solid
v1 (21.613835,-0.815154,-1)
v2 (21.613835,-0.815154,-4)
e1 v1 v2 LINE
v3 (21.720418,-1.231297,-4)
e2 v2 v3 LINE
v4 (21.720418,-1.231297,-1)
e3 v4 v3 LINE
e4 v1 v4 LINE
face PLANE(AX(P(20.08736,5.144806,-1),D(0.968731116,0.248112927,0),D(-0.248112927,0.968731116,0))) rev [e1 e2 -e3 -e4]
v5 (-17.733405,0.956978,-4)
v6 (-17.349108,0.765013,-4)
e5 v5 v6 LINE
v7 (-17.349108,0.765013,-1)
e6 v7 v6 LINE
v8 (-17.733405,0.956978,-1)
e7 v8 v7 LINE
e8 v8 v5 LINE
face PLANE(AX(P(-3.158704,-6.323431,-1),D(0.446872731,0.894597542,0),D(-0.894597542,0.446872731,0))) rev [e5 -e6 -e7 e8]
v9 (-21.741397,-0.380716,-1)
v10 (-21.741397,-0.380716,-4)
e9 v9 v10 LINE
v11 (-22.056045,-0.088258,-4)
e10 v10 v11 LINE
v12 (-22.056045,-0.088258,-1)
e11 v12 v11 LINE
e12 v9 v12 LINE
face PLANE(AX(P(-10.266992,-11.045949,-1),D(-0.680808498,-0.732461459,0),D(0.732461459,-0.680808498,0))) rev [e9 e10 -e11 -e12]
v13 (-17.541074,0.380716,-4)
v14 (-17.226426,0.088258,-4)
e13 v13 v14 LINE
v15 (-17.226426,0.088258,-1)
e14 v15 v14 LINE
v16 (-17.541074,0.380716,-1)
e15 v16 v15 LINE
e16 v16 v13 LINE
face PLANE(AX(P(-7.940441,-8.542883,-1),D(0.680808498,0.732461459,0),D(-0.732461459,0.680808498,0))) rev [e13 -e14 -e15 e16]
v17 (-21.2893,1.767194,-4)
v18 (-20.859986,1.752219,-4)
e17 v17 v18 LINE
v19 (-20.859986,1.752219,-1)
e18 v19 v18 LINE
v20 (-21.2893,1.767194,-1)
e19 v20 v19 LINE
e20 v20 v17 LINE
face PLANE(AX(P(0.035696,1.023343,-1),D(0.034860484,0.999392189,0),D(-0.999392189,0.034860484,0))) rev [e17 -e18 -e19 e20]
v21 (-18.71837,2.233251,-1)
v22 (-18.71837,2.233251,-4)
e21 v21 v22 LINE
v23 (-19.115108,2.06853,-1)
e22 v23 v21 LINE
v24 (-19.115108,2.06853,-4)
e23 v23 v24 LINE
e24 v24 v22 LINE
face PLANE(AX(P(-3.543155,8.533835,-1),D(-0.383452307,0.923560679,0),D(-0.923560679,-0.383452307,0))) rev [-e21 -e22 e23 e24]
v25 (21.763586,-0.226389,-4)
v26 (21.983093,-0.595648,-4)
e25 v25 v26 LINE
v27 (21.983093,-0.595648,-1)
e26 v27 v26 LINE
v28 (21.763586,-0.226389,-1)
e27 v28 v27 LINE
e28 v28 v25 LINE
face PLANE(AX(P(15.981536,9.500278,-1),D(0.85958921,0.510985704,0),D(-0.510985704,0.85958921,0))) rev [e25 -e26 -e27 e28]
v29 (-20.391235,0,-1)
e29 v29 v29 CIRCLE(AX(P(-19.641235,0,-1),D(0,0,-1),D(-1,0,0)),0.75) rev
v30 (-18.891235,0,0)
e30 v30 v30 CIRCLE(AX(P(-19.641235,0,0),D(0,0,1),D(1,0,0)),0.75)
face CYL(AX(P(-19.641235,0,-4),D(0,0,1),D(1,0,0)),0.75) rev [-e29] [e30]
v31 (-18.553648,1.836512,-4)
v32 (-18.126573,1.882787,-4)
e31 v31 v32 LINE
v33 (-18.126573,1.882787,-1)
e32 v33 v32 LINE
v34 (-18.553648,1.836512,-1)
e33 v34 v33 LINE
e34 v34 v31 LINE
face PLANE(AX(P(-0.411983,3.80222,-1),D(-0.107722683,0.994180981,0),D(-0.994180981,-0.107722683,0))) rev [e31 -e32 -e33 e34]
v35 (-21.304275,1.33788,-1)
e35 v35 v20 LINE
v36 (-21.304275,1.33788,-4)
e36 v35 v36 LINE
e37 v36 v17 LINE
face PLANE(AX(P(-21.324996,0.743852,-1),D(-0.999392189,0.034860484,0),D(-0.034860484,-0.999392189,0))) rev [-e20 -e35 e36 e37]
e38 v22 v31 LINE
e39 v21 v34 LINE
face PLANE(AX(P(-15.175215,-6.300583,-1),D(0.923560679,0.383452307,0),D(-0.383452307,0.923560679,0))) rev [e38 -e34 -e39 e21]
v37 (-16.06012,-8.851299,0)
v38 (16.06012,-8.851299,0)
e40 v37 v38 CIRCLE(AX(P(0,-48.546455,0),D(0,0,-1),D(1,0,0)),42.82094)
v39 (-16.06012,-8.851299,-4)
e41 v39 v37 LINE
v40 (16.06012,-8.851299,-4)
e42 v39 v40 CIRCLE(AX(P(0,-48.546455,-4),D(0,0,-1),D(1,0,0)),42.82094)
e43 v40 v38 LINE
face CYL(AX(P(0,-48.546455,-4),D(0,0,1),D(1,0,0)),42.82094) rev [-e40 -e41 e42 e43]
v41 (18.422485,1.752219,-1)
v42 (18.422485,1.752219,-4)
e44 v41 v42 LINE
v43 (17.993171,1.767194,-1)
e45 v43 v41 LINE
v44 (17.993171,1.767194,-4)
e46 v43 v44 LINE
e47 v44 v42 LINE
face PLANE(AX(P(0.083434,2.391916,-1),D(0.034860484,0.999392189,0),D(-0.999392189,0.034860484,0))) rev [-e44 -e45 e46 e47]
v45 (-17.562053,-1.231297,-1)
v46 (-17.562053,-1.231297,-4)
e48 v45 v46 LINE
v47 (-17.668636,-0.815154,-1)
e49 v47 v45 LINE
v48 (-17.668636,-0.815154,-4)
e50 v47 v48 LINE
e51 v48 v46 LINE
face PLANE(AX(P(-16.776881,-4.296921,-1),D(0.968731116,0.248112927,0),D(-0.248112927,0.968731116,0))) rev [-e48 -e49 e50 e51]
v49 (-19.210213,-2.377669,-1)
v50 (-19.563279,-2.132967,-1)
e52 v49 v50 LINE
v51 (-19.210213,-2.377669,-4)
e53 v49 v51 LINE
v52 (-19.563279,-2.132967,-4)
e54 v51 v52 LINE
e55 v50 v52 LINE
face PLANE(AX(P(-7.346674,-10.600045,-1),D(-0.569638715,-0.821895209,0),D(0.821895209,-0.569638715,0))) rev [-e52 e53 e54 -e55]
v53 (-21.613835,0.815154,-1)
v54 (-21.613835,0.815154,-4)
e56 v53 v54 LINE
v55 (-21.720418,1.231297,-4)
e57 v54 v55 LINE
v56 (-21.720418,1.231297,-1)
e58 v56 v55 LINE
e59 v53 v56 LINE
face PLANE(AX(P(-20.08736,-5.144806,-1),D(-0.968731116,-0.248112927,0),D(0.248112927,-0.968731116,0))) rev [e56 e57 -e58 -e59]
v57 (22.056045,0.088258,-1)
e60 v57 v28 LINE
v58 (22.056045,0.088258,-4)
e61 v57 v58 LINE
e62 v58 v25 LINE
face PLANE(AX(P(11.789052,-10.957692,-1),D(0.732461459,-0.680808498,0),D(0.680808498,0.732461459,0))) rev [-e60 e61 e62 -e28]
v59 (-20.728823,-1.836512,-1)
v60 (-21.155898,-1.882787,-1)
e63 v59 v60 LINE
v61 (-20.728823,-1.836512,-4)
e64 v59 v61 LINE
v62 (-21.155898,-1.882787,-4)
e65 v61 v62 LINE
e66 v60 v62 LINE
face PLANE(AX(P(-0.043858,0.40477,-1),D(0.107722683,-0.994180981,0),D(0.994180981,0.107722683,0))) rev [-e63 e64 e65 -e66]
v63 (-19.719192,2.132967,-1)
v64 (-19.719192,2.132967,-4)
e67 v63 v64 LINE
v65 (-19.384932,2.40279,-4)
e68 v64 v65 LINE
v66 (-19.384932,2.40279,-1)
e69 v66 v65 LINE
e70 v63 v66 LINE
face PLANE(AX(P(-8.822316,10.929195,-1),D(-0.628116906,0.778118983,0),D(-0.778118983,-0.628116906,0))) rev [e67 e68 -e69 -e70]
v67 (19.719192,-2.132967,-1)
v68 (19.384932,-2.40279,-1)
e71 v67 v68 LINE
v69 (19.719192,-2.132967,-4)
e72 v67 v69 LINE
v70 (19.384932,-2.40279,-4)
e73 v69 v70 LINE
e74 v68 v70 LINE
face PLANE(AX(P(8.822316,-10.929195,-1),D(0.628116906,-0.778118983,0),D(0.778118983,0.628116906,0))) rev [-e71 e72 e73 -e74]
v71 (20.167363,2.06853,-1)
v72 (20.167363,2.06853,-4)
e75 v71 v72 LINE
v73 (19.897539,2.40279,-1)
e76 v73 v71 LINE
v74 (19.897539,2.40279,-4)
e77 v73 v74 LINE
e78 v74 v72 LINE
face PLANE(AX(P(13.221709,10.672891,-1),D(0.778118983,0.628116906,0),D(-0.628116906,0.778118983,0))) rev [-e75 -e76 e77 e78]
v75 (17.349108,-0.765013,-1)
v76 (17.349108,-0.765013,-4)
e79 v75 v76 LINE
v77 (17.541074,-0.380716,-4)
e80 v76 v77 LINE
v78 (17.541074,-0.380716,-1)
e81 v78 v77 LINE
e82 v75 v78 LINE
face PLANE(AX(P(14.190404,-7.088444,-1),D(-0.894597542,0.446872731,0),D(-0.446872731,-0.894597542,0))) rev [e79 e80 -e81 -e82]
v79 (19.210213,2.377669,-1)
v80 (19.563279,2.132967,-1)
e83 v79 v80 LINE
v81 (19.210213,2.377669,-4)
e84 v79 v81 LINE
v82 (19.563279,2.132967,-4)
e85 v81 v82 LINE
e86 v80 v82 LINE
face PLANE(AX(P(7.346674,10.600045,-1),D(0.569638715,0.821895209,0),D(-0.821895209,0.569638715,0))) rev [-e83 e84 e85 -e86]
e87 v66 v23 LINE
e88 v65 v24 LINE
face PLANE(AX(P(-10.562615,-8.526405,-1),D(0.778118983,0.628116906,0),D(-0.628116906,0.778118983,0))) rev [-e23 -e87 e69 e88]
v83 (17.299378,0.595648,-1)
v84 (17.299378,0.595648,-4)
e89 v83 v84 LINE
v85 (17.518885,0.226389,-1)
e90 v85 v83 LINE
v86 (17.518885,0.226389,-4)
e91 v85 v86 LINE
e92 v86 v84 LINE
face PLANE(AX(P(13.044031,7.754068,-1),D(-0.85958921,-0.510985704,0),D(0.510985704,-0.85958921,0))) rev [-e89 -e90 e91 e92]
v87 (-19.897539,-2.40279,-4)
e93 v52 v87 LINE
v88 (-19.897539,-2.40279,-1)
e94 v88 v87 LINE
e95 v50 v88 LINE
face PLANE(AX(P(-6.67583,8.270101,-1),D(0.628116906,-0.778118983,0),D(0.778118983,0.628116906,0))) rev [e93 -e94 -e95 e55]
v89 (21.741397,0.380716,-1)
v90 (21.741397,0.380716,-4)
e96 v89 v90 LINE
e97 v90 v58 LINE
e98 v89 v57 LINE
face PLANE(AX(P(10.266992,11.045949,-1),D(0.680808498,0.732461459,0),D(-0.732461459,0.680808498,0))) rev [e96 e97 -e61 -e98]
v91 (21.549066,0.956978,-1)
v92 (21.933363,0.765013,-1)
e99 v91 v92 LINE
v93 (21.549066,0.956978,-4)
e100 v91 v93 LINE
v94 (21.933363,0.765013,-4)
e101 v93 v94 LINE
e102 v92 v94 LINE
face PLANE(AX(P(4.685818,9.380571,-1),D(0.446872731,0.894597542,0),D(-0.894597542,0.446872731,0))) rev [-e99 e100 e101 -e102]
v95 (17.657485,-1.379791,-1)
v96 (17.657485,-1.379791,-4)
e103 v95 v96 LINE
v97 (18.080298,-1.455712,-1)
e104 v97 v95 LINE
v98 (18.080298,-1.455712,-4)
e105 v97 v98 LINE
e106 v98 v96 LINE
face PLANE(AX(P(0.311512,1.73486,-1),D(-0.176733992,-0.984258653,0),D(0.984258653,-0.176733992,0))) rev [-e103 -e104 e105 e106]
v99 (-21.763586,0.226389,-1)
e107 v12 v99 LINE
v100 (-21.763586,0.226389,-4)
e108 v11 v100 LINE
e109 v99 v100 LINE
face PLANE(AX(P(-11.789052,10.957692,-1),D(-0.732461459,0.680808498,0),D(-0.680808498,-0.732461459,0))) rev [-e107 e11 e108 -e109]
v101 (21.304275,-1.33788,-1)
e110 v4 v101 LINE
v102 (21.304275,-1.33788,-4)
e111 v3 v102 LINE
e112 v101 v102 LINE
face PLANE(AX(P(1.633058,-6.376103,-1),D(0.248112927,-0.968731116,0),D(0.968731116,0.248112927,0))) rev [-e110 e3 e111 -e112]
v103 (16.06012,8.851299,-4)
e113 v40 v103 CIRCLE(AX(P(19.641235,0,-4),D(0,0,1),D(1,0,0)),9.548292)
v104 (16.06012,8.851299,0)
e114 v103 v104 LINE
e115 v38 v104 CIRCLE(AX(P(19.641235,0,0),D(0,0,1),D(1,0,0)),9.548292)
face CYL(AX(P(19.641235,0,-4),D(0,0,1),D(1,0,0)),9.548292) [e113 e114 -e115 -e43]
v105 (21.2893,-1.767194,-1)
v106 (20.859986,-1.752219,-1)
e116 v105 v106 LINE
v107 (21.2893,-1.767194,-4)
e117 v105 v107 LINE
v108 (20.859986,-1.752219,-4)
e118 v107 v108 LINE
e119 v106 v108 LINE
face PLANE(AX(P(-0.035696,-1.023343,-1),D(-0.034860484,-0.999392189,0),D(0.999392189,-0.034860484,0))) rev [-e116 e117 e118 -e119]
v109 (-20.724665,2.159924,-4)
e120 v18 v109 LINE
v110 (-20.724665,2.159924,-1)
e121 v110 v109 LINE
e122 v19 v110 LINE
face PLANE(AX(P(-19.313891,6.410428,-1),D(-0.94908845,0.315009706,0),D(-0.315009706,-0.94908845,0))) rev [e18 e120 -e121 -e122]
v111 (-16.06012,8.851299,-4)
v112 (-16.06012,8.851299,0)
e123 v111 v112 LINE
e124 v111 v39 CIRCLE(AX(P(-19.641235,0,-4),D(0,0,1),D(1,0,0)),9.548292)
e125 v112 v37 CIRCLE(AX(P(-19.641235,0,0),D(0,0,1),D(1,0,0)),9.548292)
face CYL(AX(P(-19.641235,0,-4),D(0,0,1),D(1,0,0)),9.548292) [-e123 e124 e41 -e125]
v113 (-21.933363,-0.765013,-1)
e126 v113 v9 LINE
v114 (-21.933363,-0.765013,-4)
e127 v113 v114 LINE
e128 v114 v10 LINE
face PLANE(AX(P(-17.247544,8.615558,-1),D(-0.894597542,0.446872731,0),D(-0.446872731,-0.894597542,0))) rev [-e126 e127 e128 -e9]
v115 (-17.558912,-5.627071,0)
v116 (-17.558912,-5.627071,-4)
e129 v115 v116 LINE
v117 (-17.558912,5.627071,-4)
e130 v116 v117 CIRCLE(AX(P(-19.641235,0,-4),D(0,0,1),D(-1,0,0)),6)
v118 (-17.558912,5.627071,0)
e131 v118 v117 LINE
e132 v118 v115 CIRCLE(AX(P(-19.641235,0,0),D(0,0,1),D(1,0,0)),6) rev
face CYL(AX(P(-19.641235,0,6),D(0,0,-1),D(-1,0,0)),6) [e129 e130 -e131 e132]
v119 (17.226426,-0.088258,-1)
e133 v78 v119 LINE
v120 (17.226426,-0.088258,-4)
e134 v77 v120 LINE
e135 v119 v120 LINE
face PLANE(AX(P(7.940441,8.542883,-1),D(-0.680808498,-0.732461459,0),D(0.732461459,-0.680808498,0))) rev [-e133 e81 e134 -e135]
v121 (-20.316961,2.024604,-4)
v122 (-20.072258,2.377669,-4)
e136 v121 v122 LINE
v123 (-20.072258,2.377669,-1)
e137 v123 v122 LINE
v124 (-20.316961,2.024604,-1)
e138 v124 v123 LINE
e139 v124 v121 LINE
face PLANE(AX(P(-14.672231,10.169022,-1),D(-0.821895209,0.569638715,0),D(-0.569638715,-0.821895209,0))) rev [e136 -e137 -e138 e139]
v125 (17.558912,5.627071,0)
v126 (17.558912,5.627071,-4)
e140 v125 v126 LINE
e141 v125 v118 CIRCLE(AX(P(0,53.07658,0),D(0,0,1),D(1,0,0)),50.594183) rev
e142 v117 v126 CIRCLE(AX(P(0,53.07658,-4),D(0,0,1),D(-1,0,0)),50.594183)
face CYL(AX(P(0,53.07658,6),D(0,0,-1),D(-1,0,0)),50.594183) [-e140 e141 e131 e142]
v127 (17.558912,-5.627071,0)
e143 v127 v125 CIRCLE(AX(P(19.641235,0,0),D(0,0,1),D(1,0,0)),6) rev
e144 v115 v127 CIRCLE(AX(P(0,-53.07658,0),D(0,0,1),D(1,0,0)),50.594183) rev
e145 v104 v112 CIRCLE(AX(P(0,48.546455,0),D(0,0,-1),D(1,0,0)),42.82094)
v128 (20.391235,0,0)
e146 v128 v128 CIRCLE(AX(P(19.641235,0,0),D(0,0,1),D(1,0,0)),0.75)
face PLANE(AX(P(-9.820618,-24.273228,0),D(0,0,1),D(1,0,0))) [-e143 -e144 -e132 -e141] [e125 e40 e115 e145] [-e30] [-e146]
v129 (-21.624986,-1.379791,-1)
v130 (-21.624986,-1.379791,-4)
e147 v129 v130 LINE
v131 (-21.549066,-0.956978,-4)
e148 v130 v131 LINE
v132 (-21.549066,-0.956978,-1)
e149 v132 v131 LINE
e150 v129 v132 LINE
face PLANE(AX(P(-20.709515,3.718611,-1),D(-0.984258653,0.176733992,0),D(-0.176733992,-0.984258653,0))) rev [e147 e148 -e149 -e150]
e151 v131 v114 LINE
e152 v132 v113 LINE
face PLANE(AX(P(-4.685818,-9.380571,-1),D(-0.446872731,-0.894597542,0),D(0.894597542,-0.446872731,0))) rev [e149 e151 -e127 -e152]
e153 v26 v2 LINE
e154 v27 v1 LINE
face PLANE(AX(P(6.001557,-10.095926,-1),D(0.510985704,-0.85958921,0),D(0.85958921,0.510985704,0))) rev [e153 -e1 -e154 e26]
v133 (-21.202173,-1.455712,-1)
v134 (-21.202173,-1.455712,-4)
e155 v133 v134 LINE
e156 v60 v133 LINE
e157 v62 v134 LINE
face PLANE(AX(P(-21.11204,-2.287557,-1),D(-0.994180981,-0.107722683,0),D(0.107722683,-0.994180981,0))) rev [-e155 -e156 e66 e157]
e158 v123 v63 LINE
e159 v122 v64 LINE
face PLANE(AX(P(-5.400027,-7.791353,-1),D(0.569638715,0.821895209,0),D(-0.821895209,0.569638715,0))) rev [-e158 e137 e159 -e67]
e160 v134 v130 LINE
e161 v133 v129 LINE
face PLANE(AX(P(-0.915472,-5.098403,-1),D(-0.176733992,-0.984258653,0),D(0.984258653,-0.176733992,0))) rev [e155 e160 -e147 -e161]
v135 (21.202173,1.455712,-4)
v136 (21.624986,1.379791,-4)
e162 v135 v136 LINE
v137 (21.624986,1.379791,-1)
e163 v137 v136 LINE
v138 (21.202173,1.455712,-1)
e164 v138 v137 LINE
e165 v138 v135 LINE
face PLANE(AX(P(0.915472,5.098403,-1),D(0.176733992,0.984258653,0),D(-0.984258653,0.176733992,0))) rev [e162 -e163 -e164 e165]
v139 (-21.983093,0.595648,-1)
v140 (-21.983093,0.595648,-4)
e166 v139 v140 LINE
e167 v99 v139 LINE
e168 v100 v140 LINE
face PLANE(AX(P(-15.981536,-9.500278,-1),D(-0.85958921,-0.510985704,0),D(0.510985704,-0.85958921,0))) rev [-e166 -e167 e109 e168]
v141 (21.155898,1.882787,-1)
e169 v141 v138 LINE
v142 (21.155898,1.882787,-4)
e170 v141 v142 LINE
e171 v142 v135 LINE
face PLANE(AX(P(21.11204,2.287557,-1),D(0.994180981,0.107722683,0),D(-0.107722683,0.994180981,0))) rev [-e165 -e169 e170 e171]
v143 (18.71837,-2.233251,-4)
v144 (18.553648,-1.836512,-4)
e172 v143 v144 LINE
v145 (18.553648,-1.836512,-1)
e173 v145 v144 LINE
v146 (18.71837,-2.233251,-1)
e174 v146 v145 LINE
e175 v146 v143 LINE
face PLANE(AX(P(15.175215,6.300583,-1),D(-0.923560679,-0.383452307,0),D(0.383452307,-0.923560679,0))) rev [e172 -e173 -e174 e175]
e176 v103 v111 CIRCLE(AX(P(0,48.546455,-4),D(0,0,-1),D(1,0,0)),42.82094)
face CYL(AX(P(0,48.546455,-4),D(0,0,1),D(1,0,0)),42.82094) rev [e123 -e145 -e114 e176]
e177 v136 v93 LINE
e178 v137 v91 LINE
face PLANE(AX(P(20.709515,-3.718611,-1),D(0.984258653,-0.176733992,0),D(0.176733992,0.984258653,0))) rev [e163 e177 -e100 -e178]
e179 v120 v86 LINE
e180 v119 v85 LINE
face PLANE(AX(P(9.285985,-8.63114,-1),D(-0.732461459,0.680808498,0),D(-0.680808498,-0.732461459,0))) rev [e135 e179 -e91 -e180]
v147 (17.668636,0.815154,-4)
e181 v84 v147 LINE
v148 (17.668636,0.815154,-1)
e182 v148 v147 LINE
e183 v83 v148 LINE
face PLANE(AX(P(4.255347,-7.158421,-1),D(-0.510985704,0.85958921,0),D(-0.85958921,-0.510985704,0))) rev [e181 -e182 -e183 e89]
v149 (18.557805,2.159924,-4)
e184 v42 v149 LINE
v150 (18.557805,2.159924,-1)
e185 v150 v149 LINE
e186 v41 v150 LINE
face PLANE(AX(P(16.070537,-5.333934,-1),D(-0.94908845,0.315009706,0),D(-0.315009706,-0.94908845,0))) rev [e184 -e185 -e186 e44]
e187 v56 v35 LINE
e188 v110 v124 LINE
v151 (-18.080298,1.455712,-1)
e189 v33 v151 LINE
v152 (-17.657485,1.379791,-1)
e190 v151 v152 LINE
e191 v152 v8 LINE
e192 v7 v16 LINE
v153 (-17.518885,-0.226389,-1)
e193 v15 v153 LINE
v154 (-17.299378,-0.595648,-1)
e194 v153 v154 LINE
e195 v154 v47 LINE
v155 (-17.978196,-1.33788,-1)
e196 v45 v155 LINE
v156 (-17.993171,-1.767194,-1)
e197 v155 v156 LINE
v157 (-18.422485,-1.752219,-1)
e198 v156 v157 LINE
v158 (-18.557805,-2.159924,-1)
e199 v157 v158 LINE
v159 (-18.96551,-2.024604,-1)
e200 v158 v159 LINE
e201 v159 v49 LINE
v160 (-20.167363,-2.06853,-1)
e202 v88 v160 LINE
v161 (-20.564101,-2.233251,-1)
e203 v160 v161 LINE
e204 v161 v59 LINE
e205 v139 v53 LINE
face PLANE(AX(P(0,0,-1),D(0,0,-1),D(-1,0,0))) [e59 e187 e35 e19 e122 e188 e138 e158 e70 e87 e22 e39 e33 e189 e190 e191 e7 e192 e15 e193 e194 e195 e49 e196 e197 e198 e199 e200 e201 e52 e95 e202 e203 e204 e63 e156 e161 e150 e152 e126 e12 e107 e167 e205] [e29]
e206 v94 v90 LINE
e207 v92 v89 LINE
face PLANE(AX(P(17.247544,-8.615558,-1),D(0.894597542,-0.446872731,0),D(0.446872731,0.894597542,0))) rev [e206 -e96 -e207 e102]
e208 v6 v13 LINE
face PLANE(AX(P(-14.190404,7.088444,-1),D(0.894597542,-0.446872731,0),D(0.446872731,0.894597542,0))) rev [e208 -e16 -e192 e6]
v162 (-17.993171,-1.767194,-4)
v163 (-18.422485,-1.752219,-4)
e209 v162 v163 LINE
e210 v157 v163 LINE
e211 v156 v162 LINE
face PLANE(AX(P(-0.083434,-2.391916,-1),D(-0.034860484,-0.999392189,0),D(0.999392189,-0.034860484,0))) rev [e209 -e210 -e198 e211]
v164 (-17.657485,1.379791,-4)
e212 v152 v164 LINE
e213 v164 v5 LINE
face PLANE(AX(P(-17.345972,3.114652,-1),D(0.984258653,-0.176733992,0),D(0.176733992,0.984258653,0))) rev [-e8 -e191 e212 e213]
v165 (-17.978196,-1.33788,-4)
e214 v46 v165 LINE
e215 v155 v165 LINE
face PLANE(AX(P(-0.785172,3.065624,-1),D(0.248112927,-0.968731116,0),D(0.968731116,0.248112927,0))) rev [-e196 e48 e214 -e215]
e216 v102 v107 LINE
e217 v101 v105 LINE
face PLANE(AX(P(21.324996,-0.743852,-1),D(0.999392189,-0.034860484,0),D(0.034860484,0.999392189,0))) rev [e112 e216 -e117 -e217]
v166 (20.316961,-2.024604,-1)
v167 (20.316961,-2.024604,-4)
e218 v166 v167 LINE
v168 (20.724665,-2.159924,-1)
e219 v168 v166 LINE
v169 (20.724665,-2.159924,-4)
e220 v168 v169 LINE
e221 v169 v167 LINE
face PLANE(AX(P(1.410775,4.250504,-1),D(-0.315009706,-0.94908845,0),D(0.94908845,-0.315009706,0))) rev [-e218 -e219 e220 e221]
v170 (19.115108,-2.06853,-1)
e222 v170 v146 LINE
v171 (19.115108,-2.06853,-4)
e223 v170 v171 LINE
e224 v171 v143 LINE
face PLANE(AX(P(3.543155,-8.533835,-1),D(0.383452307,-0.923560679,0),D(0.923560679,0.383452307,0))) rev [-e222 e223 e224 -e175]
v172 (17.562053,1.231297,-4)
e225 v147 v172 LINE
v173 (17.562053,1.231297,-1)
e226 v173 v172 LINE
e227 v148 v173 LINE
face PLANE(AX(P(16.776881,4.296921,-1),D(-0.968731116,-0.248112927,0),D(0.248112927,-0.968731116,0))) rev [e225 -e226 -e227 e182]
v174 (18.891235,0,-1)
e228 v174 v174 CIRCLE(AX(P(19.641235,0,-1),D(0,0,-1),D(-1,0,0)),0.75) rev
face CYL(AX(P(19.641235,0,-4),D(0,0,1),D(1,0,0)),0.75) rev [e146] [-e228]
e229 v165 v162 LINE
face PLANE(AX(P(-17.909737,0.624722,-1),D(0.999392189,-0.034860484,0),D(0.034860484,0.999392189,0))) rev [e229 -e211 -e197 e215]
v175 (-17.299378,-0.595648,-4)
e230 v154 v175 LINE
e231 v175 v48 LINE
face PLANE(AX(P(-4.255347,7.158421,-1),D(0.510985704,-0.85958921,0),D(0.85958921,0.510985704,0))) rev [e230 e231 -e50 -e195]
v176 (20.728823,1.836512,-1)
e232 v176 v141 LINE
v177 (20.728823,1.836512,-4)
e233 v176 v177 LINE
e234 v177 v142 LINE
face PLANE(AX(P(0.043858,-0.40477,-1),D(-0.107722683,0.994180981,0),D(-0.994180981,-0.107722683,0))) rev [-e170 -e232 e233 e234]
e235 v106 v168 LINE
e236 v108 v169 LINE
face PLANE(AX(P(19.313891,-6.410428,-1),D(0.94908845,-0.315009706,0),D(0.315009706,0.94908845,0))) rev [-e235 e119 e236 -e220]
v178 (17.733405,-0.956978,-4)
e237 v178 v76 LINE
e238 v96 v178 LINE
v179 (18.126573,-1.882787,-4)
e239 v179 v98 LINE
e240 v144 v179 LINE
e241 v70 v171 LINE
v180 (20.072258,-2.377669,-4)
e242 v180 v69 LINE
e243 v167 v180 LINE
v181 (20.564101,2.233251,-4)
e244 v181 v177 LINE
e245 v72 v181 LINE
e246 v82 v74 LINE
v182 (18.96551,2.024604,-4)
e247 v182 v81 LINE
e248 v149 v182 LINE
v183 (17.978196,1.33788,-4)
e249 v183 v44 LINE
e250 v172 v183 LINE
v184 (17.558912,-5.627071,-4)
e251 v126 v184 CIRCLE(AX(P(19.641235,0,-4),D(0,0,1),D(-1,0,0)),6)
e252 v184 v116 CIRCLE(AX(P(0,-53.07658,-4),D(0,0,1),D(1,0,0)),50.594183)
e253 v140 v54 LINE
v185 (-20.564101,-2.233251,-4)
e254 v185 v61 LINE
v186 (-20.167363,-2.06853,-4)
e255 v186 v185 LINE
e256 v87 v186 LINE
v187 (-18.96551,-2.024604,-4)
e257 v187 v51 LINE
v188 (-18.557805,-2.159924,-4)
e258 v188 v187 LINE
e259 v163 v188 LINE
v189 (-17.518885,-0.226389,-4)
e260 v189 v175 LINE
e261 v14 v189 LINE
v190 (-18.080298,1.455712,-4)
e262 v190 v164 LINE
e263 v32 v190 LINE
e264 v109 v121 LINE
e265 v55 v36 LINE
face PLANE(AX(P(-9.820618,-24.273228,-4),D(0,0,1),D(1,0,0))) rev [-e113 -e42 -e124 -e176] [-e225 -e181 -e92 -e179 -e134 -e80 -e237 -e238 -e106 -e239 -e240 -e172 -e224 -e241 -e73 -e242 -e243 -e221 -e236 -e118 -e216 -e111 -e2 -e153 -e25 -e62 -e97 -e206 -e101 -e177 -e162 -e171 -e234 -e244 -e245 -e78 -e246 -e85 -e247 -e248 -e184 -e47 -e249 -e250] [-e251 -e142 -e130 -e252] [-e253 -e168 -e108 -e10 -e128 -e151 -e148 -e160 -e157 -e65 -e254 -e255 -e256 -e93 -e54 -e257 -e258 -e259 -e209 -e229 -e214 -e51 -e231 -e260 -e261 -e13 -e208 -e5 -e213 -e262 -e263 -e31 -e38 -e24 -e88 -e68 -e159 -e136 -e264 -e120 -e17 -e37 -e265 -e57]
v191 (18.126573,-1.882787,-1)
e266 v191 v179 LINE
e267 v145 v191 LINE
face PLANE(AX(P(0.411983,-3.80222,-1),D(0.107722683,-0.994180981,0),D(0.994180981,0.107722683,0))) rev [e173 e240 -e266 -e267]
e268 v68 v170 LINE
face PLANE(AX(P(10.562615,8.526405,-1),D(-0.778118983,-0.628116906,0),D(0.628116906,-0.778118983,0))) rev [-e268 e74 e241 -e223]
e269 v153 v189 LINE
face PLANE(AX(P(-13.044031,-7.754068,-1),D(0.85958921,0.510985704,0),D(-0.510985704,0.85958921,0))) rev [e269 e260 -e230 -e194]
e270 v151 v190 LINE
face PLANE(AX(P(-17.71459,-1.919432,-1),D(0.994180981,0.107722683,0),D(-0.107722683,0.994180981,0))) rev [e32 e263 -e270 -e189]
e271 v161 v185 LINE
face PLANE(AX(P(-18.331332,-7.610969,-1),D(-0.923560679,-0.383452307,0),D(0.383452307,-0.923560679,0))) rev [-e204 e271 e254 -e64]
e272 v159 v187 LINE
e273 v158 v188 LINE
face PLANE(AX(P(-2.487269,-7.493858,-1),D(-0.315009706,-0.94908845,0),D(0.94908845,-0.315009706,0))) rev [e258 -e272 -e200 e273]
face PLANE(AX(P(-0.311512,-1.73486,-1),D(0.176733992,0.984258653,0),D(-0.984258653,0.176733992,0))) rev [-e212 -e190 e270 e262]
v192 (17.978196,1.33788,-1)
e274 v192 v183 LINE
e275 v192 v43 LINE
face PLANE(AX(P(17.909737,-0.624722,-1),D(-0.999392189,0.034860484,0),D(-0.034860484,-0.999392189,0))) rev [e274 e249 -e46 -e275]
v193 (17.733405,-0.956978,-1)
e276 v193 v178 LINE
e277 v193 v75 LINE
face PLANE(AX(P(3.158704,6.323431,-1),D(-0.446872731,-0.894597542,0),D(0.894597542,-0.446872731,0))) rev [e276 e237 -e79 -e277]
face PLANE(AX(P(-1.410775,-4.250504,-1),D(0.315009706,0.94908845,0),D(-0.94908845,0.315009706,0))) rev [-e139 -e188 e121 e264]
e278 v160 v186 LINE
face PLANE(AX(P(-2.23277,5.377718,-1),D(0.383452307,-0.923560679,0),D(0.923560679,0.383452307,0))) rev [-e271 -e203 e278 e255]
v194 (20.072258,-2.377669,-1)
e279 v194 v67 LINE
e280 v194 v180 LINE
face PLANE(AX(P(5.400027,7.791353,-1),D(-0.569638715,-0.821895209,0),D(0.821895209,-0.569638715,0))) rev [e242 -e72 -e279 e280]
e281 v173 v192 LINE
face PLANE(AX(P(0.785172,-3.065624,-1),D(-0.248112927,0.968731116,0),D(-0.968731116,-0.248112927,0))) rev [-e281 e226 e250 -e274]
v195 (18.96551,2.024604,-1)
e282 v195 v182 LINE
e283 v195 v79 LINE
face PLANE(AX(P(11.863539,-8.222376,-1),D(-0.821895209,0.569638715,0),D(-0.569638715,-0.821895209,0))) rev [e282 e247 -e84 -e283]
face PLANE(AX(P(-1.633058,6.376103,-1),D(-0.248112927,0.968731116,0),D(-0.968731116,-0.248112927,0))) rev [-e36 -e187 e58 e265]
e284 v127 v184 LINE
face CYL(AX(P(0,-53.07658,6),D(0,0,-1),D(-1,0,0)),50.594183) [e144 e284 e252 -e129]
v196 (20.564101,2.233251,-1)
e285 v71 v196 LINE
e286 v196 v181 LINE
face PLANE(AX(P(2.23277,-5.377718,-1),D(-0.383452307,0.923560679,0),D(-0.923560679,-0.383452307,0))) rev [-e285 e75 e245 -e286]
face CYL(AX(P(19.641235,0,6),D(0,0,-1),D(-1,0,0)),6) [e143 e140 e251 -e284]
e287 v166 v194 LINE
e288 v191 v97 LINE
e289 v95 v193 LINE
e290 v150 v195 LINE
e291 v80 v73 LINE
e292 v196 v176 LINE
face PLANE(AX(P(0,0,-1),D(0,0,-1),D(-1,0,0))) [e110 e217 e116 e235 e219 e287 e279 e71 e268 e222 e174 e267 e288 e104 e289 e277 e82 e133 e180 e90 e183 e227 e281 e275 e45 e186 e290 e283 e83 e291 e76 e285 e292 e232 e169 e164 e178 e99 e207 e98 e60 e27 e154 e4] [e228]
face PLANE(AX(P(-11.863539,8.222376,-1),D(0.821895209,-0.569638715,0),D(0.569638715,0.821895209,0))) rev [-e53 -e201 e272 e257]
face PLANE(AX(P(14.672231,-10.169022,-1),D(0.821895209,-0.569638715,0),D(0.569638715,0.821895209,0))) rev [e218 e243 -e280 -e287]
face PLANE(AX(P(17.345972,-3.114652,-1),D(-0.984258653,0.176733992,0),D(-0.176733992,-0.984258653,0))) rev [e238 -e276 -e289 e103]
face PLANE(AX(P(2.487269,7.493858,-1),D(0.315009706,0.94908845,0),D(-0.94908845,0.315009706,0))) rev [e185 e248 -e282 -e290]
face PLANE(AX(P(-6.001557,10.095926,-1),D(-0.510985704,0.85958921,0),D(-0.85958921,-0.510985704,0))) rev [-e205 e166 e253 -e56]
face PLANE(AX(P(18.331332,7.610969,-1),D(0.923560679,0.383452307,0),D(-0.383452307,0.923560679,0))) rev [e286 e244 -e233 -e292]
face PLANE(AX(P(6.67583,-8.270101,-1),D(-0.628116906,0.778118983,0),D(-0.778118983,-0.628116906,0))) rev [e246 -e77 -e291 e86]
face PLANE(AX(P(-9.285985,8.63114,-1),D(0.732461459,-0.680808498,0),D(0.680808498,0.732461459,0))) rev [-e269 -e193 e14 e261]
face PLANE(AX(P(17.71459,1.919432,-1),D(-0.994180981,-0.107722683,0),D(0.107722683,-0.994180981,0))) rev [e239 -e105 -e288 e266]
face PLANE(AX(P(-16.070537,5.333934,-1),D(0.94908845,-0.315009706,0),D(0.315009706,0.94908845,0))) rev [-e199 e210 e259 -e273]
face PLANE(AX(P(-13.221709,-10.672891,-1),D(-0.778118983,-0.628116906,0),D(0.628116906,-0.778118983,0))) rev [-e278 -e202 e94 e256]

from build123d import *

# Parameters (mm, degrees)
SKIZZE1_R                           = 0.75
AUFSATZ_LINEAR_AUSTRAGEN1_DEPTH     = 4
SCHNITT_LINEAR_START                = -3
SCHNITT_LINEAR_AUSTRAGEN2_OUTLINE_R = 0.75
SCHNITT_LINEAR_AUSTRAGEN2_DEPTH     = 3
SCHNITT_LINEAR_AUSTRAGEN3_DEPTH     = 10


# Read off the part's stored shape, not the designer's step: Schnitt-Linear austragen2
with BuildPart() as part:
    # Skizze1 → Aufsatz-Linear austragen1 (new body)
    with BuildSketch(Plane.XY):
        with BuildLine():
            ThreePointArc((-16.060120321, 8.85129891), (0, 5.725515256), (16.060120321, 8.85129891))
            ThreePointArc((16.060120321, 8.85129891), (29.189527365, 0), (16.060120321, -8.85129891))
            ThreePointArc((16.060120321, -8.85129891), (0, -5.725515256), (-16.060120321, -8.85129891))
            ThreePointArc((-16.060120321, -8.85129891), (-29.189527365, 0), (-16.060120321, 8.85129891))
        make_face()
        with Locations((-19.641235471, 0)):
            Circle(SKIZZE1_R, mode=Mode.SUBTRACT)
        with Locations((19.641235471, 0)):
            Circle(SKIZZE1_R, mode=Mode.SUBTRACT)
    extrude(amount=-AUFSATZ_LINEAR_AUSTRAGEN1_DEPTH)

    # Schnitt-Linear austragen2 outline → Schnitt-Linear austragen2 (cut)
    # profile 1 of 2: a face of its own
    with BuildSketch(Plane(origin=(0, 0, -4), x_dir=(-1, 0, 0), z_dir=(0, 0, -1)).offset(SCHNITT_LINEAR_START)):
        Polygon((20.724665483, 2.159923975), (20.316960681, 2.024603637), (20.072258051, 2.377669385), (19.719192303, 2.132966755), (19.384931733, 2.402790162), (19.115108326, 2.068529592), (18.718369619, 2.23325117), (18.553648041, 1.836512464), (18.126572608, 1.88278745), (18.080297621, 1.455712017), (17.657484574, 1.379791488), (17.733405103, 0.956978441), (17.34910824, 0.765013026), (17.541073655, 0.380716163), (17.226426423, 0.088257758), (17.518884828, -0.226389475), (17.299378073, -0.595647629), (17.668636227, -0.815154384), (17.562053082, -1.231297187), (17.978195885, -1.337880332), (17.993171082, -1.76719437), (18.42248512, -1.752219173), (18.557805458, -2.159923975), (18.965510261, -2.024603637), (19.210212891, -2.377669385), (19.563278639, -2.132966755), (19.897539209, -2.402790162), (20.167362616, -2.068529592), (20.564101323, -2.23325117), (20.728822901, -1.836512464), (21.155898334, -1.88278745), (21.20217332, -1.455712017), (21.624986367, -1.379791488), (21.549065838, -0.956978441), (21.933362701, -0.765013026), (21.741397286, -0.380716163), (22.056044519, -0.088257758), (21.763586114, 0.226389475), (21.983092869, 0.595647629), (21.613834715, 0.815154384), (21.72041786, 1.231297187), (21.304275056, 1.337880332), (21.289299859, 1.76719437), (20.859985821, 1.752219173), align=None)
        with Locations((19.641235471, 0)):
            Circle(SCHNITT_LINEAR_AUSTRAGEN2_OUTLINE_R, mode=Mode.SUBTRACT)
    # profile 2 of 2: a face of its own
    with BuildSketch(Plane(origin=(0, 0, -4), x_dir=(-1, 0, 0), z_dir=(0, 0, -1)).offset(SCHNITT_LINEAR_START)):
        Polygon((-18.557805458, 2.159923975), (-18.965510261, 2.024603637), (-19.210212891, 2.377669385), (-19.563278639, 2.132966755), (-19.897539209, 2.402790162), (-20.167362616, 2.068529592), (-20.564101323, 2.23325117), (-20.728822901, 1.836512464), (-21.155898334, 1.88278745), (-21.20217332, 1.455712017), (-21.624986367, 1.379791488), (-21.549065838, 0.956978441), (-21.933362701, 0.765013026), (-21.741397286, 0.380716163), (-22.056044519, 0.088257758), (-21.763586114, -0.226389475), (-21.983092869, -0.595647629), (-21.613834715, -0.815154384), (-21.72041786, -1.231297187), (-21.304275056, -1.337880332), (-21.289299859, -1.76719437), (-20.859985821, -1.752219173), (-20.724665483, -2.159923975), (-20.316960681, -2.024603637), (-20.072258051, -2.377669385), (-19.719192303, -2.132966755), (-19.384931733, -2.402790162), (-19.115108326, -2.068529592), (-18.718369619, -2.23325117), (-18.553648041, -1.836512464), (-18.126572608, -1.88278745), (-18.080297621, -1.455712017), (-17.657484574, -1.379791488), (-17.733405103, -0.956978441), (-17.34910824, -0.765013026), (-17.541073655, -0.380716163), (-17.226426423, -0.088257758), (-17.518884828, 0.226389475), (-17.299378073, 0.595647629), (-17.668636227, 0.815154384), (-17.562053082, 1.231297187), (-17.978195885, 1.337880332), (-17.993171082, 1.76719437), (-18.42248512, 1.752219173), align=None)
        with Locations((-19.641235471, 0)):
            Circle(SCHNITT_LINEAR_AUSTRAGEN2_OUTLINE_R, mode=Mode.SUBTRACT)
    extrude(amount=SCHNITT_LINEAR_AUSTRAGEN2_DEPTH, mode=Mode.SUBTRACT)

    # Skizze4 → Schnitt-Linear austragen3 (cut)
    with BuildSketch(Plane(origin=(0, 0, -4), x_dir=(-1, 0, 0), z_dir=(0, 0, -1))):
        with BuildLine():
            ThreePointArc((-17.558911686, -5.627070966), (-13.641235471, 0), (-17.558911686, 5.627070966))
            ThreePointArc((-17.558911686, 5.627070966), (0, 2.482397681), (17.558911686, 5.627070966))
            ThreePointArc((17.558911686, 5.627070966), (13.641235471, 0), (17.558911686, -5.627070966))
            ThreePointArc((17.558911686, -5.627070966), (0, -2.482397681), (-17.558911686, -5.627070966))
        make_face()
    extrude(amount=-SCHNITT_LINEAR_AUSTRAGEN3_DEPTH, mode=Mode.SUBTRACT)


solid = part.part
